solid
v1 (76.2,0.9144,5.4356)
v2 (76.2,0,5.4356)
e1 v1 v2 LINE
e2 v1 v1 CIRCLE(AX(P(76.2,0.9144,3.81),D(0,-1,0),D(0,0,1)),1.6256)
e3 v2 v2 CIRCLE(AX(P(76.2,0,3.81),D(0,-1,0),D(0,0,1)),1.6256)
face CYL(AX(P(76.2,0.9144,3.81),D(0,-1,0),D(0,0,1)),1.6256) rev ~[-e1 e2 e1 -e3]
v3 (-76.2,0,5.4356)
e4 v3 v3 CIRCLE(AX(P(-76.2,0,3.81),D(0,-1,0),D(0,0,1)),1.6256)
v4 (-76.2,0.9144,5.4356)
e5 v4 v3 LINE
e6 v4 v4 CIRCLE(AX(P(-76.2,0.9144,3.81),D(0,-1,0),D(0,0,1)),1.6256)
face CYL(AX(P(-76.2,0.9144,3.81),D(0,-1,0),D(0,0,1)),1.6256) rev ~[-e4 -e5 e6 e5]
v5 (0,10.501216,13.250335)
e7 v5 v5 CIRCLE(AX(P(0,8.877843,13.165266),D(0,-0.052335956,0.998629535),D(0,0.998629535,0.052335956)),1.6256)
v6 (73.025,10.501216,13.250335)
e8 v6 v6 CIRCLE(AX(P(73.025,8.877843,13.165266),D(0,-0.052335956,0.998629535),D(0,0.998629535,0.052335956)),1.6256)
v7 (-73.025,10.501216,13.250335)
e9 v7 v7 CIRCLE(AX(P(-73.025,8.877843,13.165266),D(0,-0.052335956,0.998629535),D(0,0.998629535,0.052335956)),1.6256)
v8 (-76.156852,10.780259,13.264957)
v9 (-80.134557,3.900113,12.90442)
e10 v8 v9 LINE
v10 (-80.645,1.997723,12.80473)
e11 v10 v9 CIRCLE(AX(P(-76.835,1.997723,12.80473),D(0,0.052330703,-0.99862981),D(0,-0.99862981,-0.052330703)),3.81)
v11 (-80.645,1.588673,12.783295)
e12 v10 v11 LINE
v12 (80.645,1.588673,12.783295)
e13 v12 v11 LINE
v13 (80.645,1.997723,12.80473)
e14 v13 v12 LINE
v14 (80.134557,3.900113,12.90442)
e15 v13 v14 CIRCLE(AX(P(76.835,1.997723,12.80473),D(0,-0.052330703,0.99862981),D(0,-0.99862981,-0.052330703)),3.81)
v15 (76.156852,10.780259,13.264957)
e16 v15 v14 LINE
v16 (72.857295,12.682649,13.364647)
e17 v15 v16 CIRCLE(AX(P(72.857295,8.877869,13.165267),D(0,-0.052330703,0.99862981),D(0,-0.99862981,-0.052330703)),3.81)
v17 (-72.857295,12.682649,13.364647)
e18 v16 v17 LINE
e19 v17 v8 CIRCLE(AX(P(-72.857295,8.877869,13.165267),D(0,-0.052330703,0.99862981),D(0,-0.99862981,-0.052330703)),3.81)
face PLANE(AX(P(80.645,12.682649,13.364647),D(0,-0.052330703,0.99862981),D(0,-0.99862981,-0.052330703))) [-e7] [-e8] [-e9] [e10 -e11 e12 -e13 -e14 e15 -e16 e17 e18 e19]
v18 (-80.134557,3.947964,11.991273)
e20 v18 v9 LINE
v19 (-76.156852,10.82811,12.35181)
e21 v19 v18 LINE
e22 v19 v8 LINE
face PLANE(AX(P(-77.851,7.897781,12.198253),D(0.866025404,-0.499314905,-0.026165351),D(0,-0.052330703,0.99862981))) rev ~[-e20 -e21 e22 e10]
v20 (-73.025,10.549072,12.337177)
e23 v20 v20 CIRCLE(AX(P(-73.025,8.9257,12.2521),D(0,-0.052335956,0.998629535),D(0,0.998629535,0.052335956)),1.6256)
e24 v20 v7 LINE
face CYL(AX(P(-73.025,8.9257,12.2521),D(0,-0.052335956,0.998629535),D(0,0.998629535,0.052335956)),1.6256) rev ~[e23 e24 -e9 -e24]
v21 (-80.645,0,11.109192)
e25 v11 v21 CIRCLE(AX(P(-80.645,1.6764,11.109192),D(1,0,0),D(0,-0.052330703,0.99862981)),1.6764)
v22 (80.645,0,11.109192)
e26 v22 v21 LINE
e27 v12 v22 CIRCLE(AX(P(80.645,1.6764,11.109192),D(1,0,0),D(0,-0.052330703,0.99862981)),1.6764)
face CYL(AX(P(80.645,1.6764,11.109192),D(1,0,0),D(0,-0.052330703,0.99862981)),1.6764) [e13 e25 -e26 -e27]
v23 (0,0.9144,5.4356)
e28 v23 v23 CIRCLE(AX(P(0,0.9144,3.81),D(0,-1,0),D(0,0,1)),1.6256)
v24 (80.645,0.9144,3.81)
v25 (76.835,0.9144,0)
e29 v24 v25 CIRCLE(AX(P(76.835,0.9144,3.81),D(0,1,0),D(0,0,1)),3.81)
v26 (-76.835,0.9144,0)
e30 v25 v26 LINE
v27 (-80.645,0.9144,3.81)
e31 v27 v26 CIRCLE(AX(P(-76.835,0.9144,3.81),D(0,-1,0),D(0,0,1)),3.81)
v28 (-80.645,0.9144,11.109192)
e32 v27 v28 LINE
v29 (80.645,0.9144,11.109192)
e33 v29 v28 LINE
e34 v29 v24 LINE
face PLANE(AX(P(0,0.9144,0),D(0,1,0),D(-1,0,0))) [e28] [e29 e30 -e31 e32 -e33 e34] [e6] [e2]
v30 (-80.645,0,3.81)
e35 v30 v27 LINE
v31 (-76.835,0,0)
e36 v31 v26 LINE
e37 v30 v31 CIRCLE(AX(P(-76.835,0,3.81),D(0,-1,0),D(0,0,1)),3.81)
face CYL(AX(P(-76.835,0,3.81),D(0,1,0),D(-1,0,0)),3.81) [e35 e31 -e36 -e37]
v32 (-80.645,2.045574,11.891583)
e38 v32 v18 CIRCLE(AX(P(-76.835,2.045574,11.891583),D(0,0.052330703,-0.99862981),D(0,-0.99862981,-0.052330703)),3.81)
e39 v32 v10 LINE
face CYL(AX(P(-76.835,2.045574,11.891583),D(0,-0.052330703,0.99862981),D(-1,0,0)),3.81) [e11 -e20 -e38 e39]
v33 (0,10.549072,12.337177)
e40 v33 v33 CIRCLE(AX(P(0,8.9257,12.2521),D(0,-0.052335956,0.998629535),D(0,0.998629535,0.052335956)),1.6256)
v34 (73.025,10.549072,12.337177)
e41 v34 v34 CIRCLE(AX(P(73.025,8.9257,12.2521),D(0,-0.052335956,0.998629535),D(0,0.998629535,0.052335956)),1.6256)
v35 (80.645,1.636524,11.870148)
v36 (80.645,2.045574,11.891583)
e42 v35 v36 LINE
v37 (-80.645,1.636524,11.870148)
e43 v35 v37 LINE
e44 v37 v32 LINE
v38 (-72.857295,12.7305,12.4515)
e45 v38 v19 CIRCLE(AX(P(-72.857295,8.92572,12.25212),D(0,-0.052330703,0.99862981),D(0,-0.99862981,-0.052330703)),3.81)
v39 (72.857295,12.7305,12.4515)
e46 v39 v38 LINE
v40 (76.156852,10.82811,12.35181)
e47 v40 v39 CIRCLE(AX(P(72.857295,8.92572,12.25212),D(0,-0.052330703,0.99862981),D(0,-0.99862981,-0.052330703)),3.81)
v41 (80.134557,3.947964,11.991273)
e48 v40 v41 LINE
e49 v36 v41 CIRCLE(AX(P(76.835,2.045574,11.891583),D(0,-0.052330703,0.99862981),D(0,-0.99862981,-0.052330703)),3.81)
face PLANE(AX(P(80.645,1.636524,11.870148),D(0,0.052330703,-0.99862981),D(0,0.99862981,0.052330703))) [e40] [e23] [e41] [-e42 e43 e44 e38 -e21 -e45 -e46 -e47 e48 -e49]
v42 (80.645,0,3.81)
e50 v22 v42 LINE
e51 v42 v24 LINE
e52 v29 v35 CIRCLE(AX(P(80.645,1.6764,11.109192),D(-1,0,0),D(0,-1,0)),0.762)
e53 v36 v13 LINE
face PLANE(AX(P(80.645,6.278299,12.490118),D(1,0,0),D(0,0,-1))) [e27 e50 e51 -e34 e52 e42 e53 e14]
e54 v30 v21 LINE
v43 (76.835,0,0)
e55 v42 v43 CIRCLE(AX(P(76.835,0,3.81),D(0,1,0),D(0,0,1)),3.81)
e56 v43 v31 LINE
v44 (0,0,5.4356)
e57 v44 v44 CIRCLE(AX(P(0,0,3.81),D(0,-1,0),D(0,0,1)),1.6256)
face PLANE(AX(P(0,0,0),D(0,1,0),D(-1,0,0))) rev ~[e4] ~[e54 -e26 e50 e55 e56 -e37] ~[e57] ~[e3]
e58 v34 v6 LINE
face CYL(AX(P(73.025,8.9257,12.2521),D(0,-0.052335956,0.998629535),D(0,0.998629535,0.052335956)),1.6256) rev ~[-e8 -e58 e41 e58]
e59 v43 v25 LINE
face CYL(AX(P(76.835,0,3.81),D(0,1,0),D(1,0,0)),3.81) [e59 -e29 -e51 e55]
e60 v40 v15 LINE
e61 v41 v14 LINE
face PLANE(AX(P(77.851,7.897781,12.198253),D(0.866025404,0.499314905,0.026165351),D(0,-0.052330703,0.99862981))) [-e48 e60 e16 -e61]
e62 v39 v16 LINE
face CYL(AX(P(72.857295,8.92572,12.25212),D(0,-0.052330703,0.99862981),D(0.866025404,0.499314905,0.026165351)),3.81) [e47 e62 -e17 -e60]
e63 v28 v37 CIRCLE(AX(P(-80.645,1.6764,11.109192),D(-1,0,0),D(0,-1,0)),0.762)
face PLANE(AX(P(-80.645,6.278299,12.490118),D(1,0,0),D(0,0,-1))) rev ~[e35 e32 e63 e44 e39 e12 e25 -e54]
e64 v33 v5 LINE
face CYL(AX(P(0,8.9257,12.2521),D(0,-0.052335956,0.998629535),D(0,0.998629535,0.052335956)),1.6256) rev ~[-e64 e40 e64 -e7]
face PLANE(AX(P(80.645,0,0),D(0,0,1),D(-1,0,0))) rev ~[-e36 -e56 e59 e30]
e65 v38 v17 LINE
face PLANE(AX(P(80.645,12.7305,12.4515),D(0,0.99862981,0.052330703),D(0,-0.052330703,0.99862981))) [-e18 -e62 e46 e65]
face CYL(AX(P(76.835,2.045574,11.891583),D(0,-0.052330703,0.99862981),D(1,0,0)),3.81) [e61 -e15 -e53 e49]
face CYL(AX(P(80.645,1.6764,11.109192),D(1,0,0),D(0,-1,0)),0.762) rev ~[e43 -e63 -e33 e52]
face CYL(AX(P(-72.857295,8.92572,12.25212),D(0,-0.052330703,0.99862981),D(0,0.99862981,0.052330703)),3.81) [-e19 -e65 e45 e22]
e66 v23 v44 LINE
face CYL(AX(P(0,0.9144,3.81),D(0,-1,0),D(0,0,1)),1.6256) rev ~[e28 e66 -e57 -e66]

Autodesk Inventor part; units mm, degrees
ref_plane "YZ Plane" through (0, 0, 0) normal (1, 0, 0) x (0, 1, 0)
ref_plane "XZ Plane" through (0, 0, 0) normal (0, 1, 0) x (-1, 0, 0)
ref_plane "XY Plane" through (0, 0, 0) normal (0, 0, 1) x (1, 0, 0)
sketch "Sketch1" plane through (0, 0, 0) normal (0, 1, 0) x (-1, 0, 0)
  line L0 (-80.645, 0) -> (80.645, 0)
  line L1 (80.645, 0) -> (80.645, 12.7)
  line L2 (80.645, 12.7) -> (-80.645, 12.7)
  line L3 (-80.645, 12.7) -> (-80.645, 0)
  line L4 (-80.645, 0) -> (80.645, 12.7) construction
  line L5 (80.645, 0) -> (-80.645, 12.7) construction
  point P0 (0, 0)
  point P1 (0, 6.35)
  point P2 (0, 0)
  dimension "d0" = 12.7
  dimension "d1" = 161.29
extrude "Plate1" add sketch "Sketch1" along normal blind 0.9144
sketch "Sketch2" plane through (80.645, 0.0479, 11.7869) normal (0, -0.052336, 0.9986295) x (1, 0, 0)
  line L0 (-161.29, 0) -> (0, 0)
  line L1 (0, 0) -> (0, 12.7)
  line L2 (0, 12.7) -> (-161.29, 12.7)
  line L3 (-161.29, 12.7) -> (-161.29, 0)
edge flange "Flange1" height 12.7 angle 87 thickness 0.9144 bend radius 0.762 thickness toward (0, -0.052336, 0.9986295) relief tear relief width 0.9144 relief depth 0.4572 edges at (0, 0.9144, 12.7) wall of the first edge with corners at (-80.645, 0.0479, 11.7869) (80.645, 0.0479, 11.7869) (80.645, 12.7305, 12.4515) (-80.645, 12.7305, 12.4515)
bend "Bend1"
corner "Corner1"
sketch "Sketch3" plane through (0, 0.9144, 0) normal (0, 1, 0) x (1, 0, 0)
  line L0 (76.2, -3.81) -> (-76.2, -3.81) construction
  line L1 (-80.645, 0) -> (80.645, 0) construction
  point P0 (0, 0)
  point P1 (0, -3.81)
  point P2 (0, -3.81)
  point P3 (0, 0)
  dimension "d13" = 152.4
  dimension "d14" = 3.81
hole "Hole1" at (76.2, 0.9144, 3.81) at (0, 0.9144, 3.81) at (-76.2, 0.9144, 3.81) direction (0, -1, 0) diameter 3.2512 end through all
sketch "Sketch4" plane through (80.645, 12.7305, 12.4515) normal (0, 0.052336, -0.9986295) x (-1, 0, 0)
  line L0 (7.62, -3.81) -> (153.67, -3.81) construction
  line L1 (161.29, 0) -> (0, 0) construction
  point P0 (80.645, -13.3647)
  point P1 (80.645, -3.81)
  point P2 (80.645, -3.81)
  dimension "d22" = 146.05
  dimension "d23" = 3.81
hole "Hole2" at (73.025, 8.9257, 12.2521) at (0, 8.9257, 12.2521) at (-73.025, 8.9257, 12.2521) direction (0, -0.052336, 0.9986295) diameter 3.2512 end through all
chamfer "Corner Chamfer1" distance 5.588 angle 60 2 edges at (-80.645, 12.7065, 12.9081) (80.645, 12.7065, 12.9081) measured on face at (-26.8817, 12.6985, 13.0603)
fillet "Corner Round1" radius 3.81 6 edges at (80.645, 0.4572, 0) (-80.645, 0.4572, 0) (-75.057, 12.7065, 12.9081) (75.057, 12.7065, 12.9081) (-80.645, 3.0411, 12.4015) (80.645, 3.0411, 12.4015)
equation "\"d20\" = Thickness"
equation "\"d29\" = Thickness"
equation "\"d2\" = Thickness"
equation "\"d3\" = BendReliefWidth"
equation "\"d4\" = BendReliefDepth"
equation "\"d5\" = MinimumRemnant"
equation "\"d6\" = TransitionRadius"
equation "\"d9\" = BendRadius"
equation "\"d10\" = CornerReliefSize"
equation "\"d11\" = GapSize"
equation "\"d12\" = JacobiRadiusSize"
equation "\"BendReliefWidth\" = Thickness"
equation "\"BendReliefDepth\" = 0.5 * Thickness"
equation "\"CornerReliefSize\" = 4 * Thickness"
equation "\"MinimumRemnant\" = 2 * Thickness"
equation "\"TransitionRadius\" = BendRadius"
equation "\"JacobiRadiusSize\" = BendRadius"
equation "\"GapSize\" = Thickness"
equation "\"Thickness\" = 0.9144"
equation "\"BendRadius\" = 0.762"
properties part number "J009835" material "STAINLESS STEEL, 316"
